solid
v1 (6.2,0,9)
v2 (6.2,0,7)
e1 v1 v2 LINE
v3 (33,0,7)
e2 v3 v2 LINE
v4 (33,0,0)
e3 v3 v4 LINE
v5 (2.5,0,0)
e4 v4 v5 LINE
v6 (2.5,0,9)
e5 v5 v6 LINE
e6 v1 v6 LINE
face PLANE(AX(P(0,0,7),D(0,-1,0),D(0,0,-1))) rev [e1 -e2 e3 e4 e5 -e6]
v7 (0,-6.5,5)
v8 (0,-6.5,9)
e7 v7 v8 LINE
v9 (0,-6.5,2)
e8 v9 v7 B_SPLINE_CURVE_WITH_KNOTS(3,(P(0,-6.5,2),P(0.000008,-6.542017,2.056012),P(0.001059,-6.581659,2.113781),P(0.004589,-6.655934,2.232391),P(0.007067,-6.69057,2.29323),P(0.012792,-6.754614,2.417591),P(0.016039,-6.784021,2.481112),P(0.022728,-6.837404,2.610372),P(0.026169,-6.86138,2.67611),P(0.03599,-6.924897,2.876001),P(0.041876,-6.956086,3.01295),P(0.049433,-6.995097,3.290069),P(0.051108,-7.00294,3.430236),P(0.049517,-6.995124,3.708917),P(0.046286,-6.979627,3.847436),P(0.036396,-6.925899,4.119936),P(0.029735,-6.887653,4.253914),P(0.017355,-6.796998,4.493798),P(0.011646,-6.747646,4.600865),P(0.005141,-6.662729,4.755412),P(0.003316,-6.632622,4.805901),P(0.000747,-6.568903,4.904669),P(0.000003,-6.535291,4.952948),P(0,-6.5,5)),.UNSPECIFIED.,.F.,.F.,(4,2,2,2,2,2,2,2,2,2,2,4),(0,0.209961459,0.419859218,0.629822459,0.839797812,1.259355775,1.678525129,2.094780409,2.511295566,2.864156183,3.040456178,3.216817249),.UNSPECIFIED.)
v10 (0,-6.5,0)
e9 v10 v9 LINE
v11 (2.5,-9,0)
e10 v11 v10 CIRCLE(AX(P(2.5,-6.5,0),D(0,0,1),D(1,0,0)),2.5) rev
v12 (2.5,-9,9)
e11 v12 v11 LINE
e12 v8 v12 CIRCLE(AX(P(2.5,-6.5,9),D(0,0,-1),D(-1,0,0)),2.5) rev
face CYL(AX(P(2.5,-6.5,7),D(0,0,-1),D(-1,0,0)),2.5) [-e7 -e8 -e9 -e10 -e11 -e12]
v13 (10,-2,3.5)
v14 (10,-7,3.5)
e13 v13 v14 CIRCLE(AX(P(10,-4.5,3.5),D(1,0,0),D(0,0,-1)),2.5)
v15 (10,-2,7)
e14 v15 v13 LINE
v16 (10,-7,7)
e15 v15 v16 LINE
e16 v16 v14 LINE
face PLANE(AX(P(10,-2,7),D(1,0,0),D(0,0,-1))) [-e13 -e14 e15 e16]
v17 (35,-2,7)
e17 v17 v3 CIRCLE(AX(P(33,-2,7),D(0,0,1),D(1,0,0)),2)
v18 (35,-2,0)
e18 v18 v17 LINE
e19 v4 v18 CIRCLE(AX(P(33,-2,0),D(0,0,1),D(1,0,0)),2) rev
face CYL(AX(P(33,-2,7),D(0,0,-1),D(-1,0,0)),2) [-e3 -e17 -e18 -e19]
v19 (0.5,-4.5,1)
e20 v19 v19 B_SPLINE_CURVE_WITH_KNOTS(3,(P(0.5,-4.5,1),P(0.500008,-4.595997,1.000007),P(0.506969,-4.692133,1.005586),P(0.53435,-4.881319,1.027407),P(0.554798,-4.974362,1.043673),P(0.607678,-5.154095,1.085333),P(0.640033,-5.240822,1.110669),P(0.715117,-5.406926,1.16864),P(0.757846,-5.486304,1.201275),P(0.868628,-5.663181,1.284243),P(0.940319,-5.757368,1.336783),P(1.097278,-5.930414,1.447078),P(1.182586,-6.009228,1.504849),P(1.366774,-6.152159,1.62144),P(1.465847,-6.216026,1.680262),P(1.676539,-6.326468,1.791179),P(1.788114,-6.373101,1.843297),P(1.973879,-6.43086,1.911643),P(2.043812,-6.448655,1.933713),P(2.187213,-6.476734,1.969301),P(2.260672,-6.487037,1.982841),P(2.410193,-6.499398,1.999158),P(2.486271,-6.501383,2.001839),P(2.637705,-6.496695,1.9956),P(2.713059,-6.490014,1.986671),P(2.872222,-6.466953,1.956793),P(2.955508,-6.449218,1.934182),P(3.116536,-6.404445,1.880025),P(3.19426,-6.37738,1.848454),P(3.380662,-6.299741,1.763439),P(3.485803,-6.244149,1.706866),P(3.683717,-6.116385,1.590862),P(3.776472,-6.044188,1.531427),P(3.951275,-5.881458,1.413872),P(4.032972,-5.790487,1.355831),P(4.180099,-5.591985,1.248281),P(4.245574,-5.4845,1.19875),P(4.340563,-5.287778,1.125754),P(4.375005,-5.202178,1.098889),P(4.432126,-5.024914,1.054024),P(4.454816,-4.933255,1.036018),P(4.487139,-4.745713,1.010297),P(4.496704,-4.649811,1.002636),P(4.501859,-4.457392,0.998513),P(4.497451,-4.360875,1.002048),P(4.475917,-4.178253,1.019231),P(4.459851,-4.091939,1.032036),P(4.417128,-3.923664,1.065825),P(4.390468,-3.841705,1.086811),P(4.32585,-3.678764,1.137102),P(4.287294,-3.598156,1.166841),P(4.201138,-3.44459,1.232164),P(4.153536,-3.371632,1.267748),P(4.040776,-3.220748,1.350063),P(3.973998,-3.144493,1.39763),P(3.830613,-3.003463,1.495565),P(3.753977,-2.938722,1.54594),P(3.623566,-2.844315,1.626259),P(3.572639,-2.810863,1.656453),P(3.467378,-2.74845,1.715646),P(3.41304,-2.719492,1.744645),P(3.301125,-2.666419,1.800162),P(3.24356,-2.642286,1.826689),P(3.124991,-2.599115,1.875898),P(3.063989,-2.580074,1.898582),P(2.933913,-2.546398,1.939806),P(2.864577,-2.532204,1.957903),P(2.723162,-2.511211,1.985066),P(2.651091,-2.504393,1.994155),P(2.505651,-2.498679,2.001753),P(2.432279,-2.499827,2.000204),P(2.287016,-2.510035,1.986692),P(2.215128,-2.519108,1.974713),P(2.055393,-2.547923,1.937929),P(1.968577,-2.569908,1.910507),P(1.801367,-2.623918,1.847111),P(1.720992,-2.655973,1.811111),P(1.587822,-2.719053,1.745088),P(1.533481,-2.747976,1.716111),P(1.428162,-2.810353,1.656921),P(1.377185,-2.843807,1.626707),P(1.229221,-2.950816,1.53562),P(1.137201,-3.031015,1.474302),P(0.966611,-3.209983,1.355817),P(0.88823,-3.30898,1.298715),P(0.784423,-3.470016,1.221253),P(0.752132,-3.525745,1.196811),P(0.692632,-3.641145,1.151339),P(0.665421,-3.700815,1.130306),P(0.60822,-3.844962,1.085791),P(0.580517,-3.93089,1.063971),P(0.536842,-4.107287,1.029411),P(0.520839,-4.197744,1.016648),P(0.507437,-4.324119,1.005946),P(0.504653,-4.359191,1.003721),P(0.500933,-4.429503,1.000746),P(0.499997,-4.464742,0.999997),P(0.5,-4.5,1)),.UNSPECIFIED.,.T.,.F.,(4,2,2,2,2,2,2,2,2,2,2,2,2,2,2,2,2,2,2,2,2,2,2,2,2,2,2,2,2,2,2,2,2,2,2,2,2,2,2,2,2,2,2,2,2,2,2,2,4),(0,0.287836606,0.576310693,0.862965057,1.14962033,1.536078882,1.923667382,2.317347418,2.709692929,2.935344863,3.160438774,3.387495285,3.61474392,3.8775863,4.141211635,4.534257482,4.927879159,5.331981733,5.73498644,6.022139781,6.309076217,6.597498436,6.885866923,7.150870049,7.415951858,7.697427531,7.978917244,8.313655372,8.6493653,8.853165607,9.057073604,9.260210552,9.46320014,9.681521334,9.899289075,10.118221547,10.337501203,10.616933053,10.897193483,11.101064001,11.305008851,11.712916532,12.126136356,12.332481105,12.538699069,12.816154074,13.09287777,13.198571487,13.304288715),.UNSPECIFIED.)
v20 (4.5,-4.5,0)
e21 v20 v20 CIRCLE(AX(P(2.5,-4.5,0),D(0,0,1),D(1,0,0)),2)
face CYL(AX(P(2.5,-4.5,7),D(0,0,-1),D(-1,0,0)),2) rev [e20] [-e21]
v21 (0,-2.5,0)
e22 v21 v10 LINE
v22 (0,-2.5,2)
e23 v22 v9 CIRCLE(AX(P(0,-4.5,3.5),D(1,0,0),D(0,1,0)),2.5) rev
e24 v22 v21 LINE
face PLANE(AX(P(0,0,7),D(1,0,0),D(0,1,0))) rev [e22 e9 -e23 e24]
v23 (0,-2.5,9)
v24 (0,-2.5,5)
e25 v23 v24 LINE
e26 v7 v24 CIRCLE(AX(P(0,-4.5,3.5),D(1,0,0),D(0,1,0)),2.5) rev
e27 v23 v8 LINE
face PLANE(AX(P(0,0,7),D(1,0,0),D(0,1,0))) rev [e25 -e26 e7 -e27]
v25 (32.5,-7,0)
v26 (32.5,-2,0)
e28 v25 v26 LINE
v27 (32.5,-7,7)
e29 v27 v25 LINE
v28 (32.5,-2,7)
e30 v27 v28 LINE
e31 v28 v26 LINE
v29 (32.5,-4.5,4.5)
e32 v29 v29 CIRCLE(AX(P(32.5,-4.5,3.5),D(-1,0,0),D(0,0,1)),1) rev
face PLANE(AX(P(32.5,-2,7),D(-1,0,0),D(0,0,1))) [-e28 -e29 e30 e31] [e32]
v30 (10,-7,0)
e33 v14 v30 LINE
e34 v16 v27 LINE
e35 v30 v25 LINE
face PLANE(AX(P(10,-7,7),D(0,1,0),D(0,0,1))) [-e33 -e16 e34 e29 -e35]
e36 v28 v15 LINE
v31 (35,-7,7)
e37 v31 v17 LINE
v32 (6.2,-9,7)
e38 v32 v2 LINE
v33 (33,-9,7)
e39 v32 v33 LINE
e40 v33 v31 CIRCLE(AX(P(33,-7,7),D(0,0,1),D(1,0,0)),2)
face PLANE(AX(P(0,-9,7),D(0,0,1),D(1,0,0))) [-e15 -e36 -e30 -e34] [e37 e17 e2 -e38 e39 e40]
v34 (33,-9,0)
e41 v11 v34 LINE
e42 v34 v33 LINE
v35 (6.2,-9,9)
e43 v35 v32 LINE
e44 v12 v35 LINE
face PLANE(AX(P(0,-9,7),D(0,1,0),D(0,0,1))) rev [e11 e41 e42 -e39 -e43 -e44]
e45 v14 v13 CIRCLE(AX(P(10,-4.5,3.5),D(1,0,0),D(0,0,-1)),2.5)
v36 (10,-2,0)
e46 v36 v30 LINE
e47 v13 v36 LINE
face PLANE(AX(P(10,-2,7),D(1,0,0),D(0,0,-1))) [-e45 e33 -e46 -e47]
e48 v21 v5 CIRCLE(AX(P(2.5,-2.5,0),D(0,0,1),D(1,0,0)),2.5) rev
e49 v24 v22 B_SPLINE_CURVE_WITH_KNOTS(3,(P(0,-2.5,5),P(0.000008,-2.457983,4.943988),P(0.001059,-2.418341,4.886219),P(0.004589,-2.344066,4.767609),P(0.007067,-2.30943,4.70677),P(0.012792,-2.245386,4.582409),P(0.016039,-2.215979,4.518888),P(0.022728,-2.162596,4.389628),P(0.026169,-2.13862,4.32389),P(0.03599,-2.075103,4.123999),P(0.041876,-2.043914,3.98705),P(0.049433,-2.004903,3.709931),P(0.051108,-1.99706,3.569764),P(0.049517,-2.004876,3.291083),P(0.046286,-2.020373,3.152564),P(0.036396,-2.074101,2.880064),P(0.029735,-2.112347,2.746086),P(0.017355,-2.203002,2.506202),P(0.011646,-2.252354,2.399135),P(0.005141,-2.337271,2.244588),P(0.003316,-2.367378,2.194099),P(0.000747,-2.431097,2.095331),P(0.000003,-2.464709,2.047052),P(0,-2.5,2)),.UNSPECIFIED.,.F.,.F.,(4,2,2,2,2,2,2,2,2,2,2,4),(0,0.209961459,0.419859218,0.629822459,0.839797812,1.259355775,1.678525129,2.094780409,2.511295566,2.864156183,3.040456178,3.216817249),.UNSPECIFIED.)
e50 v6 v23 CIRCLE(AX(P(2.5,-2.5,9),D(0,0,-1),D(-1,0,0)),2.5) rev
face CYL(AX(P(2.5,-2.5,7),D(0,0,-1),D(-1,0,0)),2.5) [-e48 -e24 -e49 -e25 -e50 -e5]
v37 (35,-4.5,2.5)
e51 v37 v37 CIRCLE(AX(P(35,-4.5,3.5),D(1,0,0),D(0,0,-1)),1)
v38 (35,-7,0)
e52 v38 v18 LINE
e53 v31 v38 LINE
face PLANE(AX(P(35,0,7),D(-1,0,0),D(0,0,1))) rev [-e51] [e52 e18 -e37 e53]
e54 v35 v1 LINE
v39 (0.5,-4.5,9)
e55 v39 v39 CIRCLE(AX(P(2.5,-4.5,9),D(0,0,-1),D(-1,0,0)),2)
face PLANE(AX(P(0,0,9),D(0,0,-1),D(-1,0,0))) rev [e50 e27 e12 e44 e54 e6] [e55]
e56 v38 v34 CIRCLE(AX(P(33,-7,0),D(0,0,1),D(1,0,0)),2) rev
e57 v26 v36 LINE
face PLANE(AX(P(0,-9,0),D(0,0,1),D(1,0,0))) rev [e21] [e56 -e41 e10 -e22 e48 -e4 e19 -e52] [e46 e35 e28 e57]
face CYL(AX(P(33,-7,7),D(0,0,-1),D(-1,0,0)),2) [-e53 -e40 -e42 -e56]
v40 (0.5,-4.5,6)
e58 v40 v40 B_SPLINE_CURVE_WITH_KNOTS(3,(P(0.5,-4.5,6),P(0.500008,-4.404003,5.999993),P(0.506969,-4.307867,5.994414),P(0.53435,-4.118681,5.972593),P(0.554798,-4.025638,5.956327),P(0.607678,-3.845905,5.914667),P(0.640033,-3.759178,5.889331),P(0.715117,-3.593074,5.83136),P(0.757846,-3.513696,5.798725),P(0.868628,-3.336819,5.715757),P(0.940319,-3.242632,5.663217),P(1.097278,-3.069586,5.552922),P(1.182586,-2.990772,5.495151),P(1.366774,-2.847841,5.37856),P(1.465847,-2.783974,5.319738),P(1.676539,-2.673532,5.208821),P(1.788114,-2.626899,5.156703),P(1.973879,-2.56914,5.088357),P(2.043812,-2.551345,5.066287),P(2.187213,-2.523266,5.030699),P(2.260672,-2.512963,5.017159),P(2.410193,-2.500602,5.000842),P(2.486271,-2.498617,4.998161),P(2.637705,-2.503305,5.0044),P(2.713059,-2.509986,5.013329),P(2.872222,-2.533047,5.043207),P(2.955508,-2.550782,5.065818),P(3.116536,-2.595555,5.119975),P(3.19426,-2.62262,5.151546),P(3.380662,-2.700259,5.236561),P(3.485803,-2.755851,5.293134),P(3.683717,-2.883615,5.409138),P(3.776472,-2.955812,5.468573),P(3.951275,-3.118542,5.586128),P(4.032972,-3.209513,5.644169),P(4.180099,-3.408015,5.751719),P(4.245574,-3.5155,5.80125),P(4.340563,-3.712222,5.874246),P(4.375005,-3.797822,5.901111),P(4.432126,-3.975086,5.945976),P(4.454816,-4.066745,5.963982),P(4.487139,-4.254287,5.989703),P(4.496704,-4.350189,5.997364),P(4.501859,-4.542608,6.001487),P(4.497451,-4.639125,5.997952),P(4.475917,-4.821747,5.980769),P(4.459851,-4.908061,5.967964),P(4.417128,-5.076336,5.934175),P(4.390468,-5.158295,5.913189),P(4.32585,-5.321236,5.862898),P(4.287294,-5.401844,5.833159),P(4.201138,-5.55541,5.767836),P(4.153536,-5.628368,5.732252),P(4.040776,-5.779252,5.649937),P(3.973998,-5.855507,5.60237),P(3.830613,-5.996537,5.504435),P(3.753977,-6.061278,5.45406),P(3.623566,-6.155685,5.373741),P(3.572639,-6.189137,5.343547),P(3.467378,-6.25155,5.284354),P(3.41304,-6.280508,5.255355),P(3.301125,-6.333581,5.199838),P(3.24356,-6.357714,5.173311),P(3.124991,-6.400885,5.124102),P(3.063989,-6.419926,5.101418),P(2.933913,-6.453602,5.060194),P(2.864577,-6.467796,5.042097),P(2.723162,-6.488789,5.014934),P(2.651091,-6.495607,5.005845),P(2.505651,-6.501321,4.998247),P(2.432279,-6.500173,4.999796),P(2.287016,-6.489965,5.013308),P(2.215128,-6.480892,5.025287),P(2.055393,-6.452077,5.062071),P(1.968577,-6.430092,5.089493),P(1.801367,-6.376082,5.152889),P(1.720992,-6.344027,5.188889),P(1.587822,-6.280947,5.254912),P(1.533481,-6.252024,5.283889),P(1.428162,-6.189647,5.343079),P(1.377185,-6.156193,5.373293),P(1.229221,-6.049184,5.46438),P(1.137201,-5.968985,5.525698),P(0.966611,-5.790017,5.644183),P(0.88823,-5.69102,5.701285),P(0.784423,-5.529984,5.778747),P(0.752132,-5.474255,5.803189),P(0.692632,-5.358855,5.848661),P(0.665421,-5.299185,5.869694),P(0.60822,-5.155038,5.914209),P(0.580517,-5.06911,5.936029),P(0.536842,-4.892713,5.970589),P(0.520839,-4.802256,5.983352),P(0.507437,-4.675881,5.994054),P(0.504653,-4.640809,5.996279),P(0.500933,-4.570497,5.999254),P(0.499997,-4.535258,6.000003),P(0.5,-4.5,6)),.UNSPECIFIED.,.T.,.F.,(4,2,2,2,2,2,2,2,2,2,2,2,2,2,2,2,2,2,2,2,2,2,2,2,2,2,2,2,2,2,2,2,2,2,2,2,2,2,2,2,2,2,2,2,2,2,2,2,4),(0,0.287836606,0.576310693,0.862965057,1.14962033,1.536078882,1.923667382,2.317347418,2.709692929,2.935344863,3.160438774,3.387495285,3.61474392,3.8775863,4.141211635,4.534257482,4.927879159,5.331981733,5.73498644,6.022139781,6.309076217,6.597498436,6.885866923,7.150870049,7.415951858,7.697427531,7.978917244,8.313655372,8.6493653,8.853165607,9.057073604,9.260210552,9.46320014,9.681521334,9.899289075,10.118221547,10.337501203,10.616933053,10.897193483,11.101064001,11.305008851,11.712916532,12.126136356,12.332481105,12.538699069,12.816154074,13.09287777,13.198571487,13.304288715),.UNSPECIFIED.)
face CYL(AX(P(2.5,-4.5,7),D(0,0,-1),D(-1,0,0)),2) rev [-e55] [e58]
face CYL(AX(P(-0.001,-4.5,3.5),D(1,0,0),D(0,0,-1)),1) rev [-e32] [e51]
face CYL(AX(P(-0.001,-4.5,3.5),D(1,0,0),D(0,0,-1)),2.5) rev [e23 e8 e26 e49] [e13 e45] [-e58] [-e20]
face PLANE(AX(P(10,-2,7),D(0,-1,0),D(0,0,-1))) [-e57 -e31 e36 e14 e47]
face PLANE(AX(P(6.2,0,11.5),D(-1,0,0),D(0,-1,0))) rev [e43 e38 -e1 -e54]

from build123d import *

# Parameters (mm, degrees)
SKETCH_1_W          = 35
SKETCH_1_H          = 9
SKETCH_1_R          = 2
SKETCH_1_W_2        = 22.5
SKETCH_1_H_2        = 5
EXTRUDE_1_DEPTH     = 7
SKETCH_2_W          = 6.2
SKETCH_2_H          = 9
SKETCH_2_R          = 2
EXTRUDE_2_DEPTH     = 4.5
CUT_EXTRUDE_2_REACH = 39.924
SKETCH_3_R          = 1
CUT_EXTRUDE_4_REACH = 30.953
SKETCH_5_R          = 2.5
FILLET_1_R          = 2
SKETCH_10_W         = 6.2
SKETCH_10_H         = 9
CUT_EXTRUDE_7_DEPTH = 2.5
FILLET_3_R          = 2.5


with BuildPart() as part:
    # 草图1 → 凸台-拉伸1 (new body)
    with BuildSketch(Plane.XY):
        with Locations((17.5, -4.5)):
            Rectangle(SKETCH_1_W, SKETCH_1_H)
        with Locations((2.5, -4.5)):
            Circle(SKETCH_1_R, mode=Mode.SUBTRACT)
        with Locations((21.25, -4.5)):
            Rectangle(SKETCH_1_W_2, SKETCH_1_H_2, mode=Mode.SUBTRACT)
    extrude(amount=EXTRUDE_1_DEPTH)

    # 草图2 → 凸台-拉伸2 (add)
    with BuildSketch(Plane.XY.offset(7)):
        with Locations((3.1, -4.5)):
            Rectangle(SKETCH_2_W, SKETCH_2_H)
        with Locations((2.5, -4.5)):
            Circle(SKETCH_2_R, mode=Mode.SUBTRACT)
    extrude(amount=EXTRUDE_2_DEPTH)

    # 草图3 → 切除-拉伸2 (cut, up to next)
    with BuildSketch(Plane(origin=(35, 0, 0), x_dir=(0, 0, -1), z_dir=(1, 0, 0)), mode=Mode.PRIVATE) as cut_extrude_2_sk1:
        with Locations((-3.5, -4.5)):
            Circle(SKETCH_3_R)
    cut_extrude_2_tool1 = extrude(cut_extrude_2_sk1.sketch, amount=-CUT_EXTRUDE_2_REACH, mode=Mode.PRIVATE) & part.part
    add(cut_extrude_2_tool1.solids().sort_by_distance((35, -4.5, 3.5))[0], mode=Mode.SUBTRACT)

    # 草图5 → 切除-拉伸4 (cut, up to next)
    with BuildSketch(Plane(origin=(10, 0, 0), x_dir=(0, 0, -1), z_dir=(1, 0, 0)), mode=Mode.PRIVATE) as cut_extrude_4_sk1:
        with Locations(Location((-3.5, -4.5, 0), (0, 0, 90))):
            Circle(SKETCH_5_R)
    cut_extrude_4_tool1 = extrude(cut_extrude_4_sk1.sketch, amount=-CUT_EXTRUDE_4_REACH, mode=Mode.PRIVATE) & part.part
    add(cut_extrude_4_tool1.solids().sort_by_distance((10, -4.5, 3.5))[0], mode=Mode.SUBTRACT)

    # 圆角1
    fillet_1_edges = [part.edges().sort_by_distance(p)[0] for p in [
        (35, -9, 3.5),
        (35, 0, 3.5),
    ]]
    fillet(fillet_1_edges, radius=FILLET_1_R)

    # 草图10 → 切除-拉伸7 (cut)
    with BuildSketch(Plane.XY.offset(11.5)):
        with Locations((3.1, -4.5)):
            Rectangle(SKETCH_10_W, SKETCH_10_H)
    extrude(amount=-CUT_EXTRUDE_7_DEPTH, mode=Mode.SUBTRACT)

    # 圆角3
    # the kernel refuses this fillet: 2.5 mm, written as the material it takes off along each edge
    with BuildSketch(Plane(origin=(0, 0, -6.25), x_dir=(1, 0, 0), z_dir=(0, 0, 1)), Plane(origin=(0, -9, -6.25), x_dir=(0, 1, 0), z_dir=(0, 0, 1))) as fillet_3_piece_1:
        with BuildLine():
            CenterArc((FILLET_3_R, -FILLET_3_R), FILLET_3_R, 90, 90)
            Line((0, -FILLET_3_R), (0, 0))
            Line((0, 0), (FILLET_3_R, 0))
        make_face()
    extrude(amount=21.5, mode=Mode.SUBTRACT)


solid = part.part
